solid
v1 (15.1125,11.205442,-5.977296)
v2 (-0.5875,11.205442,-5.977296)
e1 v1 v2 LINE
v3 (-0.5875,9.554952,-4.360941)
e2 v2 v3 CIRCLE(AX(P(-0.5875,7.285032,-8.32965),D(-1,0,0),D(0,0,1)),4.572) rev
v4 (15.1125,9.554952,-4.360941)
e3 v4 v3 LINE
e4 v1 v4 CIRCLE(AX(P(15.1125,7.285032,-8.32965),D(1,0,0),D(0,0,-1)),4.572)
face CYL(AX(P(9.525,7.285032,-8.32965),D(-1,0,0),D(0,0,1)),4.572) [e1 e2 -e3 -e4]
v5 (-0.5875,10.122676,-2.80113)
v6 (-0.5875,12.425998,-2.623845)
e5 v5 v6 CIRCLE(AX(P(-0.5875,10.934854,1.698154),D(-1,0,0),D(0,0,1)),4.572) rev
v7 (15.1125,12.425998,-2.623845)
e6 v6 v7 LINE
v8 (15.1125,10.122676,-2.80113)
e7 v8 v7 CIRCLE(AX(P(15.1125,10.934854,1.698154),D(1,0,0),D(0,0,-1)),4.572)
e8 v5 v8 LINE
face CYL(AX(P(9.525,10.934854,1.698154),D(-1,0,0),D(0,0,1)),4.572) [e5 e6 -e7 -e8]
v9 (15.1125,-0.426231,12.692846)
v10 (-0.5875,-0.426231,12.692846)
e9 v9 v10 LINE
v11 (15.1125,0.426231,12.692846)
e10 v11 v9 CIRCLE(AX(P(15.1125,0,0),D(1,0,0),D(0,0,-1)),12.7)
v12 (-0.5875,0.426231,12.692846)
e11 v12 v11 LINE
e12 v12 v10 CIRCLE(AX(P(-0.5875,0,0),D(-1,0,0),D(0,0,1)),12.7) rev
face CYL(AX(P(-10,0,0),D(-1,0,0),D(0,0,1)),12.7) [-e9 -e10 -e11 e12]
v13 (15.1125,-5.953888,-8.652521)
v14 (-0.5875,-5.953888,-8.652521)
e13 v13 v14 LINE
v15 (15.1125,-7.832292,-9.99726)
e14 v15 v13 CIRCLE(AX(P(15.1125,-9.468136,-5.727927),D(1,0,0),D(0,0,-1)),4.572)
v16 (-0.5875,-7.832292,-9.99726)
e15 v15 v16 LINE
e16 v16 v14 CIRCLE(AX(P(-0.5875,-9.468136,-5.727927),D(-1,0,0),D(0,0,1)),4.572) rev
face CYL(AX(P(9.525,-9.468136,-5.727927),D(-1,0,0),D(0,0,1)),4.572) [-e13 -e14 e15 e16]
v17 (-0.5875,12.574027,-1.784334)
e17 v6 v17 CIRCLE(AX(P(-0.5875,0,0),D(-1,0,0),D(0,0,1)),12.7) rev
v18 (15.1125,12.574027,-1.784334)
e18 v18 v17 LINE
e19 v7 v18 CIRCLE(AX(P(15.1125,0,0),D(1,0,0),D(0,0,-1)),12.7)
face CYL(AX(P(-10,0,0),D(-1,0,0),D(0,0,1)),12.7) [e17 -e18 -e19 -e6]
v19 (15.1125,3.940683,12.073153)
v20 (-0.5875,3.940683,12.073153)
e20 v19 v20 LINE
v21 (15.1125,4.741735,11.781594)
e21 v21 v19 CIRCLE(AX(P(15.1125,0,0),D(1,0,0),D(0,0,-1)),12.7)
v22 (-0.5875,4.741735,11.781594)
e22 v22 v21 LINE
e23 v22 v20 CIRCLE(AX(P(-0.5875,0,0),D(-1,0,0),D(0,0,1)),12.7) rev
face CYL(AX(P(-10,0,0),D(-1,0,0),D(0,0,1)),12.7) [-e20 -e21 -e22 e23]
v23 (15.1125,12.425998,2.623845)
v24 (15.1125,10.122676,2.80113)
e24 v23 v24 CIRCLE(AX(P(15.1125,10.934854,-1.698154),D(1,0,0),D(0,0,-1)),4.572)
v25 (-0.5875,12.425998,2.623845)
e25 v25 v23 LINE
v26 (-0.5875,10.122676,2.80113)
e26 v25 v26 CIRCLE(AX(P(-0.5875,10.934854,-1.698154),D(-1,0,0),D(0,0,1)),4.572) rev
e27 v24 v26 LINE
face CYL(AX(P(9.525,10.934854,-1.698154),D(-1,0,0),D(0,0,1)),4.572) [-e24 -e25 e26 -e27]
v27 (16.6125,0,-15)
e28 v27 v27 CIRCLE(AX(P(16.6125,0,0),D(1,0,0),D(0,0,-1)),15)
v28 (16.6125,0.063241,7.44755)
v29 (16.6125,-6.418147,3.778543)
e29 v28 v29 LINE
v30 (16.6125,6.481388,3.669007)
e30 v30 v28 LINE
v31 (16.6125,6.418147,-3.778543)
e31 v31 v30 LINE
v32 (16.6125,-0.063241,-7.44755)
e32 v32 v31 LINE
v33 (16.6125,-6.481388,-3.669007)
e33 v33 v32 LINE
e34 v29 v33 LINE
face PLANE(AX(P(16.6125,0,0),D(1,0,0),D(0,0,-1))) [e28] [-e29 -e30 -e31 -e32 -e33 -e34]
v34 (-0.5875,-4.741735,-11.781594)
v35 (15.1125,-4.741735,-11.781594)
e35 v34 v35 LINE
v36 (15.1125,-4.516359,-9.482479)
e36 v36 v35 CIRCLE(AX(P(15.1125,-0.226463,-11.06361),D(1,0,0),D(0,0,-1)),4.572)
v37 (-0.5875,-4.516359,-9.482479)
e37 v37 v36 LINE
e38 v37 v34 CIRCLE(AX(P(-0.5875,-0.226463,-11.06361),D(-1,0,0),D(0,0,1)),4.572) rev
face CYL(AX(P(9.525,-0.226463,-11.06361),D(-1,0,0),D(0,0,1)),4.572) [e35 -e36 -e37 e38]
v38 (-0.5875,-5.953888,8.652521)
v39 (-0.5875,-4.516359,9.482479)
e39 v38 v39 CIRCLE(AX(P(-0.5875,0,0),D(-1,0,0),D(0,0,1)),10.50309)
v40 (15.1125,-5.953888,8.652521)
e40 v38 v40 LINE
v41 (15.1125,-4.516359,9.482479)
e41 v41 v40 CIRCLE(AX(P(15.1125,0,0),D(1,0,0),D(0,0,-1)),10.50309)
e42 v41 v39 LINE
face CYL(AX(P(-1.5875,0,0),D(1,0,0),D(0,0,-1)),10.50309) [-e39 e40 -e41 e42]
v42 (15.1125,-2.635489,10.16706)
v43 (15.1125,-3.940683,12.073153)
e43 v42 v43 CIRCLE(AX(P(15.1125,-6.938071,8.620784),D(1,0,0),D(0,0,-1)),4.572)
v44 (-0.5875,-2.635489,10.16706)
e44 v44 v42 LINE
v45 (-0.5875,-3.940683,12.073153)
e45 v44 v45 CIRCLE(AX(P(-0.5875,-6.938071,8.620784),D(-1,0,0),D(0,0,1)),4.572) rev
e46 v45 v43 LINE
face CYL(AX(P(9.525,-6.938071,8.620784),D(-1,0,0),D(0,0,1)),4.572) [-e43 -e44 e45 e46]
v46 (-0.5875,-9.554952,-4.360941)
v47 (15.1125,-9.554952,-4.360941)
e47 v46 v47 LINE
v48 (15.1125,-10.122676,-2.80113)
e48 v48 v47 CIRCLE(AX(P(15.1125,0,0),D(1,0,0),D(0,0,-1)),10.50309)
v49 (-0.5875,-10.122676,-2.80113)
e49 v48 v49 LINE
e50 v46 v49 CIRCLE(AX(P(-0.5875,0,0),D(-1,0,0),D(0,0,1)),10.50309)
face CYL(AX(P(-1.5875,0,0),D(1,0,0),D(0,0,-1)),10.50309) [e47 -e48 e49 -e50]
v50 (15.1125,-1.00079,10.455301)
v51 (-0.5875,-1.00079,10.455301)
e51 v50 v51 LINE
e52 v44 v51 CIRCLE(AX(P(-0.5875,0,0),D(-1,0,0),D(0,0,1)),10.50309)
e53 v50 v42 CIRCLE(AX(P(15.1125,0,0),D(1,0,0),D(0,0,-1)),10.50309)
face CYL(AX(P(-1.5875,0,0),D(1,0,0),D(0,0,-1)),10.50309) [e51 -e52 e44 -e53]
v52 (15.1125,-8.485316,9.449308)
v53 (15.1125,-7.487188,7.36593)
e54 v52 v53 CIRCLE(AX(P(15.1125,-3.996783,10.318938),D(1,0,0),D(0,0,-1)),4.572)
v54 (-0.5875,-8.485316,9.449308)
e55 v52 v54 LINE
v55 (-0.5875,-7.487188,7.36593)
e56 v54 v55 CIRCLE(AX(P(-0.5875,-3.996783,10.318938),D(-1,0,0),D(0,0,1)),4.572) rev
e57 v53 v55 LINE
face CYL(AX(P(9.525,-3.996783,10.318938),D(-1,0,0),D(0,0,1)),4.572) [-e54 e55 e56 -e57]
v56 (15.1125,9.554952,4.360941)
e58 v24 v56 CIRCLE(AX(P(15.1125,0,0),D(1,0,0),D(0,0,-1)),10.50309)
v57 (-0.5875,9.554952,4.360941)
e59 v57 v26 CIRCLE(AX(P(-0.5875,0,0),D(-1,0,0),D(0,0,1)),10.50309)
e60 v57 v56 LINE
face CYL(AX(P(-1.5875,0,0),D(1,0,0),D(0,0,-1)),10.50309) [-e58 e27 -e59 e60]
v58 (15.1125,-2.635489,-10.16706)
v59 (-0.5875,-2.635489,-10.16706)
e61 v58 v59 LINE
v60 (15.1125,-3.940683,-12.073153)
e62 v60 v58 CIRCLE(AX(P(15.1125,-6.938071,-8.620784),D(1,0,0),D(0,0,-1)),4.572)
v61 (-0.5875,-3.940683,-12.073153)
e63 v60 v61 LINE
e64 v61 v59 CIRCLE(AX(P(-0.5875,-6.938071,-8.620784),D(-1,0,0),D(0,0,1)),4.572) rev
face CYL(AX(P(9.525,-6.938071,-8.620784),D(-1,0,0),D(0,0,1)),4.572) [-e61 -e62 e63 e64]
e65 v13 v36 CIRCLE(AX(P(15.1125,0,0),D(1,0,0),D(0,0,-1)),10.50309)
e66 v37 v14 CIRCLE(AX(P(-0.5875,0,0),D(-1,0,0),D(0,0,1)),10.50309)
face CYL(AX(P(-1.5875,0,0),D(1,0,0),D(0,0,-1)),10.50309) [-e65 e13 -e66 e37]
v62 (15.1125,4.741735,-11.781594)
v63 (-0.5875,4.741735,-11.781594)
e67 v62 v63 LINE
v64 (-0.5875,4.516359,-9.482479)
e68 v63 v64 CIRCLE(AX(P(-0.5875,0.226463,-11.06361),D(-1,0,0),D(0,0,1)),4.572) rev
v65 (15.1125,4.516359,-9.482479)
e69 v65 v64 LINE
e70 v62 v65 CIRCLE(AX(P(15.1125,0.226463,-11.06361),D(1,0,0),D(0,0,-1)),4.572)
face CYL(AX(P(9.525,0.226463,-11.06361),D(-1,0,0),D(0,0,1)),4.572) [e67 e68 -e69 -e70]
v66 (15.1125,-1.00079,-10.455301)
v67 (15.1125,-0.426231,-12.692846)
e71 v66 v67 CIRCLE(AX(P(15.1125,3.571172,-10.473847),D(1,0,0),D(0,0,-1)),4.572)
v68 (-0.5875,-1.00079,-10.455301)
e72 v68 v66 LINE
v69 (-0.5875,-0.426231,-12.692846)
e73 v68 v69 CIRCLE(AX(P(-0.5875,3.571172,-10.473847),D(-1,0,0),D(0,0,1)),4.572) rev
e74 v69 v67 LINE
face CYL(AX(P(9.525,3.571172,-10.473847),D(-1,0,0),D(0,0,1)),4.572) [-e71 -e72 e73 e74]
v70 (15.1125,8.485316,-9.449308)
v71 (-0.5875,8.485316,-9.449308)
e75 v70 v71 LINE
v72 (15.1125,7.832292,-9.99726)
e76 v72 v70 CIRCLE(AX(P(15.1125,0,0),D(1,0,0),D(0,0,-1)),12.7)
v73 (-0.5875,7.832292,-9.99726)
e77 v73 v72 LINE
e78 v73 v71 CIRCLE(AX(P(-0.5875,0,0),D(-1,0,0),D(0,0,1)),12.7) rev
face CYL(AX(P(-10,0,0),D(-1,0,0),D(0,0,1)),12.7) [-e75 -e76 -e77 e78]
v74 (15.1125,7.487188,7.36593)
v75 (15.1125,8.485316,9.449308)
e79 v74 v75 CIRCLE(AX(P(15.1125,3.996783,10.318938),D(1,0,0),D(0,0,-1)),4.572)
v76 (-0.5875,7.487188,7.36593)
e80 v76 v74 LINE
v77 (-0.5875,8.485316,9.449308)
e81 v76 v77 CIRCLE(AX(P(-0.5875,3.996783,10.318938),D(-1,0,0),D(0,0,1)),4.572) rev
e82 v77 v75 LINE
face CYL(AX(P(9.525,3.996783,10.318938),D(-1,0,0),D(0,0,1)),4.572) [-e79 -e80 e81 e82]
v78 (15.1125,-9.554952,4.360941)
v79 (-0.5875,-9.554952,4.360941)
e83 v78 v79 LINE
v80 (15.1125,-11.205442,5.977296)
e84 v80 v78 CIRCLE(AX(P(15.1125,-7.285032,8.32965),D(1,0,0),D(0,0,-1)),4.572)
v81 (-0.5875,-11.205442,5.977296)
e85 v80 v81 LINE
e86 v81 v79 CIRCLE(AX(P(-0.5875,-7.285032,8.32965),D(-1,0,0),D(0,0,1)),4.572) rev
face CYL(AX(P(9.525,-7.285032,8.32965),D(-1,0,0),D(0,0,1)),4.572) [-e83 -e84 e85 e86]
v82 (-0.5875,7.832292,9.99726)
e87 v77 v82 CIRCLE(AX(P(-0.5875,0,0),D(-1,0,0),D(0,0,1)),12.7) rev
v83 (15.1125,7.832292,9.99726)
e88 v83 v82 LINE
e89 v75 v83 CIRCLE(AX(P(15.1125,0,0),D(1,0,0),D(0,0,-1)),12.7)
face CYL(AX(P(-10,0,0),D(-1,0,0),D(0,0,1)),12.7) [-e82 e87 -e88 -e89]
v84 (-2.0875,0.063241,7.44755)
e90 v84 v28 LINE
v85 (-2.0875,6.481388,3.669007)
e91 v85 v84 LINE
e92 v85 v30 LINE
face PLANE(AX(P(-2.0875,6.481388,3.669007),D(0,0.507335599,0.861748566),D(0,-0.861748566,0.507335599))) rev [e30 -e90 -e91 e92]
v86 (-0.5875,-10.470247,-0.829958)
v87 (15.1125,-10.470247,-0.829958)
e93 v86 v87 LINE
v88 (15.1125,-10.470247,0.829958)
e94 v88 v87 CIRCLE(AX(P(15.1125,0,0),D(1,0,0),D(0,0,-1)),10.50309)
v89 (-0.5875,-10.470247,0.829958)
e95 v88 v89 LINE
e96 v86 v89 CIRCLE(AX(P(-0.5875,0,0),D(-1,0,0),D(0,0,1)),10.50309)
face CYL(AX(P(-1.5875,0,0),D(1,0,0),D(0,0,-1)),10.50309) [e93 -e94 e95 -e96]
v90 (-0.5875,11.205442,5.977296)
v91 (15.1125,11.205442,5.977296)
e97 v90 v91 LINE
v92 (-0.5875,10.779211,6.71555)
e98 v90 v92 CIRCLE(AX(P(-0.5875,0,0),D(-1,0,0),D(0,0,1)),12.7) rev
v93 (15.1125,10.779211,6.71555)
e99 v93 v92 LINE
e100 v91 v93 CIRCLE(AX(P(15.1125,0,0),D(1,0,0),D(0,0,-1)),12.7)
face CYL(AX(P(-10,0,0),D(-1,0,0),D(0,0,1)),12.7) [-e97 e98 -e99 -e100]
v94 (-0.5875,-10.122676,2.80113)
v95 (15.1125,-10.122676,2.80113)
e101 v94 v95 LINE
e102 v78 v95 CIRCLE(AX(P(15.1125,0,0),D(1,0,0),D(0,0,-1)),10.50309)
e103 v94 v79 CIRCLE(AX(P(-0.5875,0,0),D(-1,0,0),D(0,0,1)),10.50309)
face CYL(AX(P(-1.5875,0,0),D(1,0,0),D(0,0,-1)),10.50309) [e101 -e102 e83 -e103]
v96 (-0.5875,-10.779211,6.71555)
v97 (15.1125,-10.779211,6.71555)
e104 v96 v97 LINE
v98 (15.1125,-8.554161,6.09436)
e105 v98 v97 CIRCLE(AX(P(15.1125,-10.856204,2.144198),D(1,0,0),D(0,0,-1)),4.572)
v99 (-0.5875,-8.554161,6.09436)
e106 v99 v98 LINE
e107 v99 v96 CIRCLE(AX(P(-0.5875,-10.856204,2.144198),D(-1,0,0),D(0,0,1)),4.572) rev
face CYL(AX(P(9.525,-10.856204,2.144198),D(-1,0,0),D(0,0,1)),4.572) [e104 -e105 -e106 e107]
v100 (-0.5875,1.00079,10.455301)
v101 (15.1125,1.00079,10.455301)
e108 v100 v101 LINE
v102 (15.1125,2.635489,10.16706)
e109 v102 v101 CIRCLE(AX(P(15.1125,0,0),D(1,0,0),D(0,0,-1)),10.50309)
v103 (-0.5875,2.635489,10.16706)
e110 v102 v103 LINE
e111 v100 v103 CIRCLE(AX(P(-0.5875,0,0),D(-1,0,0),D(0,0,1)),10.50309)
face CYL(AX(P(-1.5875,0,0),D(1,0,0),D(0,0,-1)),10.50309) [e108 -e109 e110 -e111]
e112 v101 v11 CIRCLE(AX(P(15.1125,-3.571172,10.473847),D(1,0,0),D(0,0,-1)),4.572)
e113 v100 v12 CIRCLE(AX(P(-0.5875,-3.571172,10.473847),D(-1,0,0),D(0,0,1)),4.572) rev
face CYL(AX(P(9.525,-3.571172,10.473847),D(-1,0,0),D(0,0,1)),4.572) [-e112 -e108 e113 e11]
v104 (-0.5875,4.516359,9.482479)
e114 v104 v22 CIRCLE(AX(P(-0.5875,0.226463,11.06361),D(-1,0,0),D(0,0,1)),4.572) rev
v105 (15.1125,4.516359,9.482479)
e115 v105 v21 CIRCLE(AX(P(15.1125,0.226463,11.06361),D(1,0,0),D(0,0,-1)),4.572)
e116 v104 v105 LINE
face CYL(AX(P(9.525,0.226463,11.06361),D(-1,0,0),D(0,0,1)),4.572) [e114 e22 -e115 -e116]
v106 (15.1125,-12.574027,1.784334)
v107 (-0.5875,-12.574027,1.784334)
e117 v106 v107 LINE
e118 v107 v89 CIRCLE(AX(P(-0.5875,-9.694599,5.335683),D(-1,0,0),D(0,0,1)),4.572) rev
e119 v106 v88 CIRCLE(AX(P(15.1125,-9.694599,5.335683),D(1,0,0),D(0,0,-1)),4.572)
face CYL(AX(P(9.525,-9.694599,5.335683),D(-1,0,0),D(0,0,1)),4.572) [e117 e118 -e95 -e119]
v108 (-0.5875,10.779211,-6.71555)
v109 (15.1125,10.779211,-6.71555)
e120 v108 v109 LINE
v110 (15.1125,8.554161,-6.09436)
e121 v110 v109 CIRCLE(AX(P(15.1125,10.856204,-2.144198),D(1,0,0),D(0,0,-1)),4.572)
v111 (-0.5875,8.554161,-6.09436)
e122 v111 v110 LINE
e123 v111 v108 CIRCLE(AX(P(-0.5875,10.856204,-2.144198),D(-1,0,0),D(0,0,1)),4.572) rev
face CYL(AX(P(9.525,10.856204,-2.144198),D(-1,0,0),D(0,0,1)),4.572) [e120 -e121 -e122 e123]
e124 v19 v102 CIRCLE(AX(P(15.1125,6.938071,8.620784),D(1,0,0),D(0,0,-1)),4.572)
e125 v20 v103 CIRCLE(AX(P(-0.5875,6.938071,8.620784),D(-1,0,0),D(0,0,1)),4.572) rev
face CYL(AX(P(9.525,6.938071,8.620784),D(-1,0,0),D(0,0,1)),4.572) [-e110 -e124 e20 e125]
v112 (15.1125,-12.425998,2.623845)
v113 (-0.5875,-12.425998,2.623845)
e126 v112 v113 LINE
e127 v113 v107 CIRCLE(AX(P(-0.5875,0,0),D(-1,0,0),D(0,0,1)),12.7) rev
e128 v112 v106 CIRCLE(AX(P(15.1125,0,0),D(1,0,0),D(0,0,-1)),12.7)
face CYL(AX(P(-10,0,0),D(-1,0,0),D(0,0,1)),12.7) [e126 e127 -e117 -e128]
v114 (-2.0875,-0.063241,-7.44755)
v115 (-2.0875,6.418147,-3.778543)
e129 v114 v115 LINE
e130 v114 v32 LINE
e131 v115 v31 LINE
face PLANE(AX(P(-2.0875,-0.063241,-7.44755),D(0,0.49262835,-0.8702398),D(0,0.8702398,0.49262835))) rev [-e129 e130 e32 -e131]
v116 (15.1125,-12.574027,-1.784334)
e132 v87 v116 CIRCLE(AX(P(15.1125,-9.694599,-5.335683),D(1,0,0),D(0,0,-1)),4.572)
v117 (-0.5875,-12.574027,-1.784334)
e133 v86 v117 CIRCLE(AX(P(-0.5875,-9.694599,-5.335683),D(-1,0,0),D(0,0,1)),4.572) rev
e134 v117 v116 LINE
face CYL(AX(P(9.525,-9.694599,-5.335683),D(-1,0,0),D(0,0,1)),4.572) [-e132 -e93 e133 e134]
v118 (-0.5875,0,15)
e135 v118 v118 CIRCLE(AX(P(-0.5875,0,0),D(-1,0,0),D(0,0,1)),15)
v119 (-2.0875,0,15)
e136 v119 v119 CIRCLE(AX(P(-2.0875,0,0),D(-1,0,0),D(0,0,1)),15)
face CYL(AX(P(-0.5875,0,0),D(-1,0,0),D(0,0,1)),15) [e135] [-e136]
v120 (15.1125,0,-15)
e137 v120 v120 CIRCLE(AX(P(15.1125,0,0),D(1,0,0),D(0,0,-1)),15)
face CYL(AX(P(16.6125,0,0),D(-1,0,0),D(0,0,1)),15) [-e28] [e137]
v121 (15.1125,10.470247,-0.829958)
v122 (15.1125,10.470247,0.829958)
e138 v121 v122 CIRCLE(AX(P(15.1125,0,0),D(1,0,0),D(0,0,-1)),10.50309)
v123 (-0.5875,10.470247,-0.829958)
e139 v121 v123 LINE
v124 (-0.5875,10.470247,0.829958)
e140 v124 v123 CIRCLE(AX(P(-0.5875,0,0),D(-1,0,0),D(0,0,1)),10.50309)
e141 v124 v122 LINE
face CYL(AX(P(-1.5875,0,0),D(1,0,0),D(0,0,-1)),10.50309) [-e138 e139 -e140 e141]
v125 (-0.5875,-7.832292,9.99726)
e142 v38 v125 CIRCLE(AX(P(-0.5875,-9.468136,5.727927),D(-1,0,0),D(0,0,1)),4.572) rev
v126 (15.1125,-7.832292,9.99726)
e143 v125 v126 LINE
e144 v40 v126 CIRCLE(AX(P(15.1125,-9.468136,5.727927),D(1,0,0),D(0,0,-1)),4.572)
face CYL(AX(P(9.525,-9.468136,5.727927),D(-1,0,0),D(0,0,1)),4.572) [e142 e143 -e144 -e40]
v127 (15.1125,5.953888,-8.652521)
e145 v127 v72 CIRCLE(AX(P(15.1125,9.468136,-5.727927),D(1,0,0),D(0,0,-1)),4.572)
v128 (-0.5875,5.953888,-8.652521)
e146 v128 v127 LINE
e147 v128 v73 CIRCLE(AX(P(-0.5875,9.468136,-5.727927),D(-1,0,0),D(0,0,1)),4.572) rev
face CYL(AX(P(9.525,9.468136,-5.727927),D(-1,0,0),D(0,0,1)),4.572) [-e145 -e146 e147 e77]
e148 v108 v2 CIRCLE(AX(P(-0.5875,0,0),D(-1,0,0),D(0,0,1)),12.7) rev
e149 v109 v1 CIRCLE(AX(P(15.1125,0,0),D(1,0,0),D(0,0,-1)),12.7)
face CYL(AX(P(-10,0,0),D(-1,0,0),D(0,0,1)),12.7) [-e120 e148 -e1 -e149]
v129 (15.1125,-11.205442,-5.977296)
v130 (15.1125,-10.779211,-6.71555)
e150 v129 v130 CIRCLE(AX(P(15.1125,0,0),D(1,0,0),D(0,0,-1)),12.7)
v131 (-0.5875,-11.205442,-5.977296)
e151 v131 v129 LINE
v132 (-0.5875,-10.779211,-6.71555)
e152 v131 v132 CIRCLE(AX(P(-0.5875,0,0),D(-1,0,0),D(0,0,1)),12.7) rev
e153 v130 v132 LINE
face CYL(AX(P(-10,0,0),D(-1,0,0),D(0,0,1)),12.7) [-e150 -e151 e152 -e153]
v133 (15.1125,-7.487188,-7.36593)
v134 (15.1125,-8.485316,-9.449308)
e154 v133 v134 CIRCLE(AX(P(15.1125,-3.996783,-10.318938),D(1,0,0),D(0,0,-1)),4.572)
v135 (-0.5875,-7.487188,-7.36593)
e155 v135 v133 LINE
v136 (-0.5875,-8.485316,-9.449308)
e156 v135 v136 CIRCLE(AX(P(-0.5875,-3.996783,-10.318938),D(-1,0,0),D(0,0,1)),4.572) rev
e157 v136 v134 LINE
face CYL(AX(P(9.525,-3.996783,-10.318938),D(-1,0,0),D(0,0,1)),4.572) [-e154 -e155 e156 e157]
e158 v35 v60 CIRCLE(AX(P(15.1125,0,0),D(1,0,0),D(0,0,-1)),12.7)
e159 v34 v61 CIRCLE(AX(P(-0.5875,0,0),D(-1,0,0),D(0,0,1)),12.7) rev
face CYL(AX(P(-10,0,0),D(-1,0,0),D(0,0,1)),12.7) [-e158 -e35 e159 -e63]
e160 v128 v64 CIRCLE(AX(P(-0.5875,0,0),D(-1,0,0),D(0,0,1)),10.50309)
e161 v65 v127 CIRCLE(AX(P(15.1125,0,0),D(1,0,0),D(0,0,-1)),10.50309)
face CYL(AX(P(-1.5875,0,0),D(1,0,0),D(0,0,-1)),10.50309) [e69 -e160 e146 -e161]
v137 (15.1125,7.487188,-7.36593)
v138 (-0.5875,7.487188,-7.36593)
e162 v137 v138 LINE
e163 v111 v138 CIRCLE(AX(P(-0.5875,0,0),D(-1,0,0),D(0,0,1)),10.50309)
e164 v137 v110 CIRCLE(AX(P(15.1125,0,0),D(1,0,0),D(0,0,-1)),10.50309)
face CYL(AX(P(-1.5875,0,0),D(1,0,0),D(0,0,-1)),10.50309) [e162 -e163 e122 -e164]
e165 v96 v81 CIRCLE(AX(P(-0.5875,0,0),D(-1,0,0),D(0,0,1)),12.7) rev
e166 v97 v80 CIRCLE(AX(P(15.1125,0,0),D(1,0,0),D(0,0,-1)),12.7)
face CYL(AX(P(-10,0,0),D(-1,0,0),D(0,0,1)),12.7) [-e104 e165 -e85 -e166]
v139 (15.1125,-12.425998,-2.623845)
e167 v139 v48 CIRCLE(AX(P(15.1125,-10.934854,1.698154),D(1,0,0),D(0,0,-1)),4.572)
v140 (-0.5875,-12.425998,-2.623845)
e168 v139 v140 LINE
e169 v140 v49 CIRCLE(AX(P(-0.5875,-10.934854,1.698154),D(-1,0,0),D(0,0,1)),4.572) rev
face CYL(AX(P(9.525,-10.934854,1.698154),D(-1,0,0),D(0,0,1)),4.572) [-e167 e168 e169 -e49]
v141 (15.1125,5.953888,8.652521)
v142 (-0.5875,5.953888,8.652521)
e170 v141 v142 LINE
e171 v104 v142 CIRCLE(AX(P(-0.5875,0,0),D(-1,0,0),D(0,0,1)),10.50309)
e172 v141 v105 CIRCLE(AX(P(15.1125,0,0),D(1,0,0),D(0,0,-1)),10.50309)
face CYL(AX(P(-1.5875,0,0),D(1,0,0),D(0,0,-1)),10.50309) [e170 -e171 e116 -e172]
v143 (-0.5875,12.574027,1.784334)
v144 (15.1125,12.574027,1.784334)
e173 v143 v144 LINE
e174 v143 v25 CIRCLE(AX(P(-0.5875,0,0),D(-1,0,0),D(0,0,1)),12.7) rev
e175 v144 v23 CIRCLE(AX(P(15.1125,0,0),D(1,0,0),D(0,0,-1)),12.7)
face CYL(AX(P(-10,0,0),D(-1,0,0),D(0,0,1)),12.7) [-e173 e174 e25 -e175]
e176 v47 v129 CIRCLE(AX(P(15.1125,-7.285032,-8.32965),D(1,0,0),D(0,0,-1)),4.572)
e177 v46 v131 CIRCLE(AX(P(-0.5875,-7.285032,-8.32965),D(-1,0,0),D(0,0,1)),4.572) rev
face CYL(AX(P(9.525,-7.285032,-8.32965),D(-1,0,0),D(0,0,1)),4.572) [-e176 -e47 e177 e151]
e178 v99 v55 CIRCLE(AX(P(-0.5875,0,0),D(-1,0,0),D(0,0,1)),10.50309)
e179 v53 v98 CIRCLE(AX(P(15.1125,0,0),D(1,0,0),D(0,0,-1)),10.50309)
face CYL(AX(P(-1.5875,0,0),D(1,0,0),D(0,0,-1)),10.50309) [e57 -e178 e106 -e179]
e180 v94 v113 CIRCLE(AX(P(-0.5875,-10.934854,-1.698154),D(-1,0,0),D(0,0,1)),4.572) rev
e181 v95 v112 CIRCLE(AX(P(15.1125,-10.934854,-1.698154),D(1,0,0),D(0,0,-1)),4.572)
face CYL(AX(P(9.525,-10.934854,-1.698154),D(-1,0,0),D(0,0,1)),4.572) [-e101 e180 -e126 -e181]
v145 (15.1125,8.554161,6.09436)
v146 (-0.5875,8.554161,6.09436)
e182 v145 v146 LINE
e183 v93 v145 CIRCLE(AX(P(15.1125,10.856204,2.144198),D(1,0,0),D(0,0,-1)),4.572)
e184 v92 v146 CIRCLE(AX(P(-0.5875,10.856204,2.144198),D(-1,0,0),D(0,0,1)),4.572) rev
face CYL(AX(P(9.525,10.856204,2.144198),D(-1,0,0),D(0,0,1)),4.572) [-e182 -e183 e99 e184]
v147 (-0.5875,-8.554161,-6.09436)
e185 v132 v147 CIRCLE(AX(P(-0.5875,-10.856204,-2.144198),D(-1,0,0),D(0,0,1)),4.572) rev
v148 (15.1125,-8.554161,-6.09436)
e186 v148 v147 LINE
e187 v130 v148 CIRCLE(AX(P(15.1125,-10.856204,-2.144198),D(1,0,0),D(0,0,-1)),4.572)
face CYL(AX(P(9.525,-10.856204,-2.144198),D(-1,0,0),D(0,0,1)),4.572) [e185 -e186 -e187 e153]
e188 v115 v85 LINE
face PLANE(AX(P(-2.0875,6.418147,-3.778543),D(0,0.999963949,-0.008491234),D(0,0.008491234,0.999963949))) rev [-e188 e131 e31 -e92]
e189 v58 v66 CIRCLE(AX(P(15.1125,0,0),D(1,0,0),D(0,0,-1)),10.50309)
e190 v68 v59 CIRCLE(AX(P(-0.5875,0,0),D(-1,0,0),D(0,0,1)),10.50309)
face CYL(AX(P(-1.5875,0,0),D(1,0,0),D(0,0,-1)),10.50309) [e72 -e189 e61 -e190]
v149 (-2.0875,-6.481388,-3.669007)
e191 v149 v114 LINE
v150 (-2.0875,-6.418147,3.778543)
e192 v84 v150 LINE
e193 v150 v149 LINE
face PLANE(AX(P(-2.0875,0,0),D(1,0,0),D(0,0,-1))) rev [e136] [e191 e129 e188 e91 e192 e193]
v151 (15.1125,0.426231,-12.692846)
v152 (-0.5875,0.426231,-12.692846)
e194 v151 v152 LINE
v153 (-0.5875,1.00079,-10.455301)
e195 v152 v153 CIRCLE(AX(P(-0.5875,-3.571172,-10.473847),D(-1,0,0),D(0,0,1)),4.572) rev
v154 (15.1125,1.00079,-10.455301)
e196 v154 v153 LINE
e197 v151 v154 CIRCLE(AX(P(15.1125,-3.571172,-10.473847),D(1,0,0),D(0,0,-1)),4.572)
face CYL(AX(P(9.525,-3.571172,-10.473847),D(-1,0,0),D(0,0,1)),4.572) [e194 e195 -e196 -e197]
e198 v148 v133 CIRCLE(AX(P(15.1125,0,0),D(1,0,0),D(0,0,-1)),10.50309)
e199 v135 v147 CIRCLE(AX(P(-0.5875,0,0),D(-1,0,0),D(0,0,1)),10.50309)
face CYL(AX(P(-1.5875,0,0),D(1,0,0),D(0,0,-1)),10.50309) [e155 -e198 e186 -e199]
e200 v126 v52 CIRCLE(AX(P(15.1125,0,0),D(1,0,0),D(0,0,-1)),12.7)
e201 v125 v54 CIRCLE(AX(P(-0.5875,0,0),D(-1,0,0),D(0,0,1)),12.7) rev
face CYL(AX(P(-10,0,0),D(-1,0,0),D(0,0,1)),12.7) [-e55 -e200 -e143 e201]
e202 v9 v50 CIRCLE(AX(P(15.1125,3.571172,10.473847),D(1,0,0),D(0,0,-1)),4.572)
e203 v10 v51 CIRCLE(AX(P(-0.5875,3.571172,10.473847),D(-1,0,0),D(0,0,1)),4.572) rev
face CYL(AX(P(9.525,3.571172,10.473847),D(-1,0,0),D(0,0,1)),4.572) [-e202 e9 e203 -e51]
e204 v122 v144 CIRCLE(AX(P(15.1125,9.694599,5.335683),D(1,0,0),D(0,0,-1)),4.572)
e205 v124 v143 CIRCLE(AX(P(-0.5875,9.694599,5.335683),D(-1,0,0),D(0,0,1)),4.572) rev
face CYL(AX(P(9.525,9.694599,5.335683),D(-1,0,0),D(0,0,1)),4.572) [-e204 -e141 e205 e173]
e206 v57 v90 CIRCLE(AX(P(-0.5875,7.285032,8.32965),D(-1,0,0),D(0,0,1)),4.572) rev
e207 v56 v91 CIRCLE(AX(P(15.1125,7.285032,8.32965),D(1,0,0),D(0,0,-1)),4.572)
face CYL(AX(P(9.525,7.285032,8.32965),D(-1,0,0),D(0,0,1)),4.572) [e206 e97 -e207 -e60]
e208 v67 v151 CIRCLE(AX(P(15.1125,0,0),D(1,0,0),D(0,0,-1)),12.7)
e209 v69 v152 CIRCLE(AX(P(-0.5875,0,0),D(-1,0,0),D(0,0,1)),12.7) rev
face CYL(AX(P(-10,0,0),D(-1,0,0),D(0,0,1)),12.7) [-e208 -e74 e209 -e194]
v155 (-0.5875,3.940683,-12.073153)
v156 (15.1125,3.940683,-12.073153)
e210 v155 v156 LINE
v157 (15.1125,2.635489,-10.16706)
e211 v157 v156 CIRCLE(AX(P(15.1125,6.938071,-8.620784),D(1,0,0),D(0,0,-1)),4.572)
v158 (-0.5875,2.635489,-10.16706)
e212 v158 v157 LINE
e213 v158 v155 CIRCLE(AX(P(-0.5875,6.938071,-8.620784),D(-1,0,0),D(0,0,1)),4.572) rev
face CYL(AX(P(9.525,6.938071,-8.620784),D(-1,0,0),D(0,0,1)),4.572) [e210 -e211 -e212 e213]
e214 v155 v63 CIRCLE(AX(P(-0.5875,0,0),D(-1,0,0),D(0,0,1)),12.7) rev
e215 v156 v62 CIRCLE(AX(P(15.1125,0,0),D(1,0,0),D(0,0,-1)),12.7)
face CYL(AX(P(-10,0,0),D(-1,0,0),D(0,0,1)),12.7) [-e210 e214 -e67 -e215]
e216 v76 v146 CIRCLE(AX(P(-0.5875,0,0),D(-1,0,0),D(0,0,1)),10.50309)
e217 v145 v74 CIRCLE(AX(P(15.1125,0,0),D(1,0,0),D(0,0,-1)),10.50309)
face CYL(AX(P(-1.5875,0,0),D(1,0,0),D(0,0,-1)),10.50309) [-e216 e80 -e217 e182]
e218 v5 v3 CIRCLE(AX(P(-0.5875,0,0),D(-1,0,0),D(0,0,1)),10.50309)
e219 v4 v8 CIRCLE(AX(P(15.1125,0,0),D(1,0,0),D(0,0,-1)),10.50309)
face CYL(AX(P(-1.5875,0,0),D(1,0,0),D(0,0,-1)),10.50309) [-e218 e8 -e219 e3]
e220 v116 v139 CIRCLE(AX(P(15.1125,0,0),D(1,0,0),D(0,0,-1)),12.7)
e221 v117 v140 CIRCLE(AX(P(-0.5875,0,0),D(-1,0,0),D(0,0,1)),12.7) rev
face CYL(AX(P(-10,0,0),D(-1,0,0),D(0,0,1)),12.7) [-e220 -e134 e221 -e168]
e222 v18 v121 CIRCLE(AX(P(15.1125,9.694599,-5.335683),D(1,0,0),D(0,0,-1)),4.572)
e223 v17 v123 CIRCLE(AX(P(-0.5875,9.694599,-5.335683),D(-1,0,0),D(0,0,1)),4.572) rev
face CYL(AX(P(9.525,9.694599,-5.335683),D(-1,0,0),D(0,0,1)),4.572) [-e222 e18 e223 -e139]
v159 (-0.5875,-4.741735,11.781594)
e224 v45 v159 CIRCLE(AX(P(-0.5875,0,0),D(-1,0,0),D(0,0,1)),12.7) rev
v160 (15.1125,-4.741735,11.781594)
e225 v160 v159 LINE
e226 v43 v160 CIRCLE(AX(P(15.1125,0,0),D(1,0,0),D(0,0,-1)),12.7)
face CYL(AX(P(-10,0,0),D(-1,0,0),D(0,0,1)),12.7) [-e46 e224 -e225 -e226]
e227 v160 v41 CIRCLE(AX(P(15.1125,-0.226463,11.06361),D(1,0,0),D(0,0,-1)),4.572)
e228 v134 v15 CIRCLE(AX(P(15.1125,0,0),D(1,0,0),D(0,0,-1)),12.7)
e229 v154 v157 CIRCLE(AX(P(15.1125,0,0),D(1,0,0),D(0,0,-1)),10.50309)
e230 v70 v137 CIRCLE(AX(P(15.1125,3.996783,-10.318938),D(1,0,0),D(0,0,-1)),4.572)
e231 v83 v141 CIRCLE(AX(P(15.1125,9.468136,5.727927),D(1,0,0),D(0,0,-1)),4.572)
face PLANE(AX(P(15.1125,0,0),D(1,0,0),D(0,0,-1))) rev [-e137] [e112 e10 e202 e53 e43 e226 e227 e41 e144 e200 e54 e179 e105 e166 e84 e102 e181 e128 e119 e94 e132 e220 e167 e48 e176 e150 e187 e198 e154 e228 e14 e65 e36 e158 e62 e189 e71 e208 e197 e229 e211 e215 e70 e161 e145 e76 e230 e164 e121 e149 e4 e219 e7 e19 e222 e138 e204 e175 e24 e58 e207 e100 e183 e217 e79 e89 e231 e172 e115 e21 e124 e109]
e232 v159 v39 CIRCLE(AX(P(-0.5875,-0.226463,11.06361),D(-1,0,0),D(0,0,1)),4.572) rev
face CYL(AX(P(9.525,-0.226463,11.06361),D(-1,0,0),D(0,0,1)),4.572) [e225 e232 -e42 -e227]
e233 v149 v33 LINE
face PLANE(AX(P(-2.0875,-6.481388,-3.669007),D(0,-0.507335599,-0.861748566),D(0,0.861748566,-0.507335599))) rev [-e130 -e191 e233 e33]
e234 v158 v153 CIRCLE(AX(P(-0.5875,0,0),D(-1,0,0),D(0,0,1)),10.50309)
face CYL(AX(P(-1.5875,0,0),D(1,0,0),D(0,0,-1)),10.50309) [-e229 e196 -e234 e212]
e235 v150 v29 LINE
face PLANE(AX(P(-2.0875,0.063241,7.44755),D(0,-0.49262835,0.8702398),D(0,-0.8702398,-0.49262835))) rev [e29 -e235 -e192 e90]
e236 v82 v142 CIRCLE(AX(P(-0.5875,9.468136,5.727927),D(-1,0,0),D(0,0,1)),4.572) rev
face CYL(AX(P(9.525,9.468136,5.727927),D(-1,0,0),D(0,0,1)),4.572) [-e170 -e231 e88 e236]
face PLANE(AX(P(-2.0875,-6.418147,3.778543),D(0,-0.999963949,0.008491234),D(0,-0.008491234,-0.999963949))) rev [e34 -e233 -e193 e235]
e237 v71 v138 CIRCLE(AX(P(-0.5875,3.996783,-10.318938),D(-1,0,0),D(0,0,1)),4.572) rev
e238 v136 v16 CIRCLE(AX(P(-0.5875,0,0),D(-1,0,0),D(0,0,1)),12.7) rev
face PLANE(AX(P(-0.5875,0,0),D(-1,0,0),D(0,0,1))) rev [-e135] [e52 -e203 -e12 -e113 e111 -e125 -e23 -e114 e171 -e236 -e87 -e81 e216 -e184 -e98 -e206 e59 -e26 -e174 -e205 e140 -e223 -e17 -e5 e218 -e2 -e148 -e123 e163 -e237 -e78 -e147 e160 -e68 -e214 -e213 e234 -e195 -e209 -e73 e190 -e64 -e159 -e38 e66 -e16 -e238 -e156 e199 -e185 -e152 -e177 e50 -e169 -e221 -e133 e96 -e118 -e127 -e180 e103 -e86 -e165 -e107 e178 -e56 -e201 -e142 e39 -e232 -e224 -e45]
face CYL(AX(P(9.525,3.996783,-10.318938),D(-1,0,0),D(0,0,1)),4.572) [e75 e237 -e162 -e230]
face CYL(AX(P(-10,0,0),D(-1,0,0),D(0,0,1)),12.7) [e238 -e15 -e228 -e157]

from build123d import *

# Parameters (mm, degrees)
BOSS_EXTRUDE1_DEPTH      = 4
BOSS_EXTRUDE1_DEPTH_BACK = 13.2
SKETCH2_R                = 15
SKETCH2_R_2              = 7.854644271
BOSS_EXTRUDE2_DEPTH      = 1.5
SKETCH3_R                = 15
SKETCH3_R_2              = 9.60106287
BOSS_EXTRUDE3_DEPTH      = 1.5
BOSS_EXTRUDE4_DEPTH      = 1.5
BOSS_EXTRUDE4_DEPTH_BACK = 16.7
SKETCH5_R                = 10.503090292
CUT_EXTRUDE1_DEPTH       = 29.278790639


# Read off the part's stored shape, not the designer's step: am-4212 18T 20DP 500hex 375 FW.STEP<1>
with BuildPart() as part:
    # Sketch1 → Boss-Extrude1 (new, two sides: drawn at the far end of the back side and taken through both)
    # profile 1 of 19: a face of its own
    with BuildSketch(Plane(origin=(11.1125, 0, 0), x_dir=(0, 0, -1), z_dir=(1, 0, 0)).offset(-BOSS_EXTRUDE1_DEPTH_BACK)):
        with BuildLine():
            ThreePointArc((-12.692845514, 0.426230867), (-12.7, 0), (-12.692845514, -0.426230867))
            ThreePointArc((-12.692845514, -0.426230867), (-12.311027604, -0.61546759), (-11.913249275, -0.768333072))
            ThreePointArc((-11.913249275, -0.768333072), (-11.938, 0), (-11.913249275, 0.768333072))
            ThreePointArc((-11.913249275, 0.768333072), (-12.311027604, 0.61546759), (-12.692845514, 0.426230867))
        make_face()
    # profile 2 of 19: a face of its own
    with BuildSketch(Plane(origin=(11.1125, 0, 0), x_dir=(0, 0, -1), z_dir=(1, 0, 0)).offset(-BOSS_EXTRUDE1_DEPTH_BACK)):
        with BuildLine():
            ThreePointArc((-11.913249275, 0.768333072), (-11.938, 0), (-11.913249275, -0.768333072))
            ThreePointArc((-11.913249275, -0.768333072), (-10.87193442, -0.983463934), (-9.809087715, -0.952242218))
            ThreePointArc((-9.809087715, -0.952242218), (-9.705477367, -1.711337521), (-9.543213362, -2.4600906))
            ThreePointArc((-9.543213362, -2.4600906), (-10.552641024, -2.794266767), (-11.457577821, -3.352574307))
            ThreePointArc((-11.457577821, -3.352574307), (-11.218050507, -4.083036471), (-10.932007046, -4.796568142))
            ThreePointArc((-10.932007046, -4.796568142), (-9.879912073, -4.64257437), (-8.891841322, -4.249720572))
            ThreePointArc((-8.891841322, -4.249720572), (-8.534853559, -4.9276), (-8.126286635, -5.575700185))
            ThreePointArc((-8.126286635, -5.575700185), (-8.96054338, -6.234967657), (-9.619953385, -7.069111745))
            ThreePointArc((-9.619953385, -7.069111745), (-9.145038562, -7.673598484), (-8.632203428, -8.246266305))
            ThreePointArc((-8.632203428, -8.246266305), (-7.696226517, -7.74172182), (-6.902107637, -7.034619905))
            ThreePointArc((-6.902107637, -7.034619905), (-6.334800451, -7.549521196), (-5.729209809, -8.01879804))
            ThreePointArc((-5.729209809, -8.01879804), (-6.287671961, -8.923639429), (-6.622020596, -9.933009978))
            ThreePointArc((-6.622020596, -9.933009978), (-5.969, -10.33861127), (-5.291228679, -10.70134305))
            ThreePointArc((-5.291228679, -10.70134305), (-4.58426246, -9.907103363), (-4.079877906, -8.971040258))
            ThreePointArc((-4.079877906, -8.971040258), (-3.370676917, -9.260858716), (-2.641105726, -9.494710506))
            ThreePointArc((-2.641105726, -9.494710506), (-2.856414507, -10.535988587), (-2.825374393, -11.598840612))
            ThreePointArc((-2.825374393, -11.598840612), (-2.073011945, -11.756634955), (-1.312053661, -11.865679887))
            ThreePointArc((-1.312053661, -11.865679887), (-0.919368693, -10.877542027), (-0.765554687, -9.825420757))
            ThreePointArc((-0.765554687, -9.825420757), (0, -9.8552), (0.765554687, -9.825420757))
            ThreePointArc((0.765554687, -9.825420757), (0.919368693, -10.877542027), (1.312053661, -11.865679887))
            ThreePointArc((1.312053661, -11.865679887), (2.073011945, -11.756634955), (2.825374393, -11.598840612))
            ThreePointArc((2.825374393, -11.598840612), (2.856414507, -10.535988587), (2.641105726, -9.494710506))
            ThreePointArc((2.641105726, -9.494710506), (3.370676917, -9.260858716), (4.079877906, -8.971040258))
            ThreePointArc((4.079877906, -8.971040258), (4.58426246, -9.907103363), (5.291228679, -10.70134305))
            ThreePointArc((5.291228679, -10.70134305), (5.969, -10.33861127), (6.622020596, -9.933009978))
            ThreePointArc((6.622020596, -9.933009978), (6.287671961, -8.923639429), (5.729209809, -8.01879804))
            ThreePointArc((5.729209809, -8.01879804), (6.334800451, -7.549521196), (6.902107637, -7.034619905))
            ThreePointArc((6.902107637, -7.034619905), (7.696226517, -7.74172182), (8.632203428, -8.246266305))
            ThreePointArc((8.632203428, -8.246266305), (9.145038562, -7.673598484), (9.619953385, -7.069111745))
            ThreePointArc((9.619953385, -7.069111745), (8.96054338, -6.234967657), (8.126286635, -5.575700185))
            ThreePointArc((8.126286635, -5.575700185), (8.534853559, -4.9276), (8.891841322, -4.249720572))
            ThreePointArc((8.891841322, -4.249720572), (9.879912073, -4.64257437), (10.932007046, -4.796568142))
            ThreePointArc((10.932007046, -4.796568142), (11.218050507, -4.083036471), (11.457577821, -3.352574307))
            ThreePointArc((11.457577821, -3.352574307), (10.552641024, -2.794266767), (9.543213362, -2.4600906))
            ThreePointArc((9.543213362, -2.4600906), (9.705477367, -1.711337521), (9.809087715, -0.952242218))
            ThreePointArc((9.809087715, -0.952242218), (10.87193442, -0.983463934), (11.913249275, -0.768333072))
            ThreePointArc((11.913249275, -0.768333072), (11.938, 0), (11.913249275, 0.768333072))
            ThreePointArc((11.913249275, 0.768333072), (10.87193442, 0.983463934), (9.809087715, 0.952242218))
            ThreePointArc((9.809087715, 0.952242218), (9.705477367, 1.711337521), (9.543213362, 2.4600906))
            ThreePointArc((9.543213362, 2.4600906), (10.552641024, 2.794266767), (11.457577821, 3.352574307))
            ThreePointArc((11.457577821, 3.352574307), (11.218050507, 4.083036471), (10.932007046, 4.796568142))
            ThreePointArc((10.932007046, 4.796568142), (9.879912073, 4.64257437), (8.891841322, 4.249720572))
            ThreePointArc((8.891841322, 4.249720572), (8.534853559, 4.9276), (8.126286635, 5.575700185))
            ThreePointArc((8.126286635, 5.575700185), (8.96054338, 6.234967657), (9.619953385, 7.069111745))
            ThreePointArc((9.619953385, 7.069111745), (9.145038562, 7.673598484), (8.632203428, 8.246266305))
            ThreePointArc((8.632203428, 8.246266305), (7.696226517, 7.74172182), (6.902107637, 7.034619905))
            ThreePointArc((6.902107637, 7.034619905), (6.334800451, 7.549521196), (5.729209809, 8.01879804))
            ThreePointArc((5.729209809, 8.01879804), (6.287671961, 8.923639429), (6.622020596, 9.933009978))
            ThreePointArc((6.622020596, 9.933009978), (5.969, 10.33861127), (5.291228679, 10.70134305))
            ThreePointArc((5.291228679, 10.70134305), (4.58426246, 9.907103363), (4.079877906, 8.971040258))
            ThreePointArc((4.079877906, 8.971040258), (3.370676917, 9.260858716), (2.641105726, 9.494710506))
            ThreePointArc((2.641105726, 9.494710506), (2.856414507, 10.535988587), (2.825374393, 11.598840612))
            ThreePointArc((2.825374393, 11.598840612), (2.073011945, 11.756634955), (1.312053661, 11.865679887))
            ThreePointArc((1.312053661, 11.865679887), (0.919368693, 10.877542027), (0.765554687, 9.825420757))
            ThreePointArc((0.765554687, 9.825420757), (0, 9.8552), (-0.765554687, 9.825420757))
            ThreePointArc((-0.765554687, 9.825420757), (-0.919368693, 10.877542027), (-1.312053661, 11.865679887))
            ThreePointArc((-1.312053661, 11.865679887), (-2.073011945, 11.756634955), (-2.825374393, 11.598840612))
            ThreePointArc((-2.825374393, 11.598840612), (-2.856414507, 10.535988587), (-2.641105726, 9.494710506))
            ThreePointArc((-2.641105726, 9.494710506), (-3.370676917, 9.260858716), (-4.079877906, 8.971040258))
            ThreePointArc((-4.079877906, 8.971040258), (-4.58426246, 9.907103363), (-5.291228679, 10.70134305))
            ThreePointArc((-5.291228679, 10.70134305), (-5.969, 10.33861127), (-6.622020596, 9.933009978))
            ThreePointArc((-6.622020596, 9.933009978), (-6.287671961, 8.923639429), (-5.729209809, 8.01879804))
            ThreePointArc((-5.729209809, 8.01879804), (-6.334800451, 7.549521196), (-6.902107637, 7.034619905))
            ThreePointArc((-6.902107637, 7.034619905), (-7.696226517, 7.74172182), (-8.632203428, 8.246266305))
            ThreePointArc((-8.632203428, 8.246266305), (-9.145038562, 7.673598484), (-9.619953385, 7.069111745))
            ThreePointArc((-9.619953385, 7.069111745), (-8.96054338, 6.234967657), (-8.126286635, 5.575700185))
            ThreePointArc((-8.126286635, 5.575700185), (-8.534853559, 4.9276), (-8.891841322, 4.249720572))
            ThreePointArc((-8.891841322, 4.249720572), (-9.879912073, 4.64257437), (-10.932007046, 4.796568142))
            ThreePointArc((-10.932007046, 4.796568142), (-11.218050507, 4.083036471), (-11.457577821, 3.352574307))
            ThreePointArc((-11.457577821, 3.352574307), (-10.552641024, 2.794266767), (-9.543213362, 2.4600906))
            ThreePointArc((-9.543213362, 2.4600906), (-9.705477367, 1.711337521), (-9.809087715, 0.952242218))
            ThreePointArc((-9.809087715, 0.952242218), (-10.87193442, 0.983463934), (-11.913249275, 0.768333072))
        make_face()
        Polygon((-3.666174209, -6.35), (-7.332348419, 0), (-3.666174209, 6.35), (3.666174209, 6.35), (7.332348419, 0), (3.666174209, -6.35), align=None, mode=Mode.SUBTRACT)
    # profile 3 of 19: a face of its own
    with BuildSketch(Plane(origin=(11.1125, 0, 0), x_dir=(0, 0, -1), z_dir=(1, 0, 0)).offset(-BOSS_EXTRUDE1_DEPTH_BACK)):
        with BuildLine():
            ThreePointArc((-10.932007046, -4.796568142), (-11.218050507, -4.083036471), (-11.457577821, -3.352574307))
            ThreePointArc((-11.457577821, -3.352574307), (-11.779084107, -3.632269073), (-12.073152809, -3.940682842))
            ThreePointArc((-12.073152809, -3.940682842), (-11.934096284, -4.34365582), (-11.781593724, -4.741734842))
            ThreePointArc((-11.781593724, -4.741734842), (-11.35807948, -4.788969778), (-10.932007046, -4.796568142))
        make_face()
    # profile 4 of 19: a face of its own
    with BuildSketch(Plane(origin=(11.1125, 0, 0), x_dir=(0, 0, -1), z_dir=(1, 0, 0)).offset(-BOSS_EXTRUDE1_DEPTH_BACK)):
        with BuildLine():
            ThreePointArc((-12.073152809, 3.940682842), (-11.779084107, 3.632269073), (-11.457577821, 3.352574307))
            ThreePointArc((-11.457577821, 3.352574307), (-11.218050507, 4.083036471), (-10.932007046, 4.796568142))
            ThreePointArc((-10.932007046, 4.796568142), (-11.35807948, 4.788969778), (-11.781593724, 4.741734842))
            ThreePointArc((-11.781593724, 4.741734842), (-11.934096284, 4.34365582), (-12.073152809, 3.940682842))
        make_face()
    # profile 5 of 19: a face of its own
    with BuildSketch(Plane(origin=(11.1125, 0, 0), x_dir=(0, 0, -1), z_dir=(1, 0, 0)).offset(-BOSS_EXTRUDE1_DEPTH_BACK)):
        with BuildLine():
            ThreePointArc((-8.632203428, -8.246266305), (-9.145038562, -7.673598484), (-9.619953385, -7.069111745))
            ThreePointArc((-9.619953385, -7.069111745), (-9.826409226, -7.441900479), (-9.997259693, -7.832292041))
            ThreePointArc((-9.997259693, -7.832292041), (-9.728764428, -8.163402643), (-9.449307854, -8.485315615))
            ThreePointArc((-9.449307854, -8.485315615), (-9.035179344, -8.384851534), (-8.632203428, -8.246266305))
        make_face()
    # profile 6 of 19: a face of its own
    with BuildSketch(Plane(origin=(11.1125, 0, 0), x_dir=(0, 0, -1), z_dir=(1, 0, 0)).offset(-BOSS_EXTRUDE1_DEPTH_BACK)):
        with BuildLine():
            ThreePointArc((-9.997259693, 7.832292041), (-9.826409226, 7.441900479), (-9.619953385, 7.069111745))
            ThreePointArc((-9.619953385, 7.069111745), (-9.145038562, 7.673598484), (-8.632203428, 8.246266305))
            ThreePointArc((-8.632203428, 8.246266305), (-9.035179344, 8.384851534), (-9.449307854, 8.485315615))
            ThreePointArc((-9.449307854, 8.485315615), (-9.728764428, 8.163402643), (-9.997259693, 7.832292041))
        make_face()
    # profile 7 of 19: a face of its own
    with BuildSketch(Plane(origin=(11.1125, 0, 0), x_dir=(0, 0, -1), z_dir=(1, 0, 0)).offset(-BOSS_EXTRUDE1_DEPTH_BACK)):
        with BuildLine():
            ThreePointArc((-5.291228679, -10.70134305), (-5.969, -10.33861127), (-6.622020596, -9.933009978))
            ThreePointArc((-6.622020596, -9.933009978), (-6.68852437, -10.353928857), (-6.715549515, -10.779211228))
            ThreePointArc((-6.715549515, -10.779211228), (-6.35, -10.998522628), (-5.977295999, -11.205442095))
            ThreePointArc((-5.977295999, -11.205442095), (-5.622503234, -10.969396447), (-5.291228679, -10.70134305))
        make_face()
    # profile 8 of 19: a face of its own
    with BuildSketch(Plane(origin=(11.1125, 0, 0), x_dir=(0, 0, -1), z_dir=(1, 0, 0)).offset(-BOSS_EXTRUDE1_DEPTH_BACK)):
        with BuildLine():
            ThreePointArc((-6.715549515, 10.779211228), (-6.68852437, 10.353928857), (-6.622020596, 9.933009978))
            ThreePointArc((-6.622020596, 9.933009978), (-5.969, 10.33861127), (-5.291228679, 10.70134305))
            ThreePointArc((-5.291228679, 10.70134305), (-5.622503234, 10.969396447), (-5.977295999, 11.205442095))
            ThreePointArc((-5.977295999, 11.205442095), (-6.35, 10.998522628), (-6.715549515, 10.779211228))
        make_face()
    # profile 9 of 19: a face of its own
    with BuildSketch(Plane(origin=(11.1125, 0, 0), x_dir=(0, 0, -1), z_dir=(1, 0, 0)).offset(-BOSS_EXTRUDE1_DEPTH_BACK)):
        with BuildLine():
            ThreePointArc((-1.312053661, -11.865679887), (-2.073011945, -11.756634955), (-2.825374393, -11.598840612))
            ThreePointArc((-2.825374393, -11.598840612), (-2.743904763, -12.017120606), (-2.623844955, -12.425998457))
            ThreePointArc((-2.623844955, -12.425998457), (-2.205331856, -12.507058463), (-1.784334031, -12.574026883))
            ThreePointArc((-1.784334031, -12.574026883), (-1.531670254, -12.230870257), (-1.312053661, -11.865679887))
        make_face()
    # profile 10 of 19: a face of its own
    with BuildSketch(Plane(origin=(11.1125, 0, 0), x_dir=(0, 0, -1), z_dir=(1, 0, 0)).offset(-BOSS_EXTRUDE1_DEPTH_BACK)):
        with BuildLine():
            ThreePointArc((-2.623844955, 12.425998457), (-2.743904763, 12.017120606), (-2.825374393, 11.598840612))
            ThreePointArc((-2.825374393, 11.598840612), (-2.073011945, 11.756634955), (-1.312053661, 11.865679887))
            ThreePointArc((-1.312053661, 11.865679887), (-1.531670254, 12.230870257), (-1.784334031, 12.574026883))
            ThreePointArc((-1.784334031, 12.574026883), (-2.205331856, 12.507058463), (-2.623844955, 12.425998457))
        make_face()
    # profile 11 of 19: a face of its own
    with BuildSketch(Plane(origin=(11.1125, 0, 0), x_dir=(0, 0, -1), z_dir=(1, 0, 0)).offset(-BOSS_EXTRUDE1_DEPTH_BACK)):
        with BuildLine():
            ThreePointArc((2.825374393, -11.598840612), (2.073011945, -11.756634955), (1.312053661, -11.865679887))
            ThreePointArc((1.312053661, -11.865679887), (1.531670254, -12.230870257), (1.784334031, -12.574026883))
            ThreePointArc((1.784334031, -12.574026883), (2.205331856, -12.507058463), (2.623844955, -12.425998457))
            ThreePointArc((2.623844955, -12.425998457), (2.743904763, -12.017120606), (2.825374393, -11.598840612))
        make_face()
    # profile 12 of 19: a face of its own
    with BuildSketch(Plane(origin=(11.1125, 0, 0), x_dir=(0, 0, -1), z_dir=(1, 0, 0)).offset(-BOSS_EXTRUDE1_DEPTH_BACK)):
        with BuildLine():
            ThreePointArc((1.784334031, 12.574026883), (1.531670254, 12.230870257), (1.312053661, 11.865679887))
            ThreePointArc((1.312053661, 11.865679887), (2.073011945, 11.756634955), (2.825374393, 11.598840612))
            ThreePointArc((2.825374393, 11.598840612), (2.743904763, 12.017120606), (2.623844955, 12.425998457))
            ThreePointArc((2.623844955, 12.425998457), (2.205331856, 12.507058463), (1.784334031, 12.574026883))
        make_face()
    # profile 13 of 19: a face of its own
    with BuildSketch(Plane(origin=(11.1125, 0, 0), x_dir=(0, 0, -1), z_dir=(1, 0, 0)).offset(-BOSS_EXTRUDE1_DEPTH_BACK)):
        with BuildLine():
            ThreePointArc((6.622020596, -9.933009978), (5.969, -10.33861127), (5.291228679, -10.70134305))
            ThreePointArc((5.291228679, -10.70134305), (5.622503234, -10.969396447), (5.977295999, -11.205442095))
            ThreePointArc((5.977295999, -11.205442095), (6.35, -10.998522628), (6.715549515, -10.779211228))
            ThreePointArc((6.715549515, -10.779211228), (6.68852437, -10.353928857), (6.622020596, -9.933009978))
        make_face()
    # profile 14 of 19: a face of its own
    with BuildSketch(Plane(origin=(11.1125, 0, 0), x_dir=(0, 0, -1), z_dir=(1, 0, 0)).offset(-BOSS_EXTRUDE1_DEPTH_BACK)):
        with BuildLine():
            ThreePointArc((5.977295999, 11.205442095), (5.622503234, 10.969396447), (5.291228679, 10.70134305))
            ThreePointArc((5.291228679, 10.70134305), (5.969, 10.33861127), (6.622020596, 9.933009978))
            ThreePointArc((6.622020596, 9.933009978), (6.68852437, 10.353928857), (6.715549515, 10.779211228))
            ThreePointArc((6.715549515, 10.779211228), (6.35, 10.998522628), (5.977295999, 11.205442095))
        make_face()
    # profile 15 of 19: a face of its own
    with BuildSketch(Plane(origin=(11.1125, 0, 0), x_dir=(0, 0, -1), z_dir=(1, 0, 0)).offset(-BOSS_EXTRUDE1_DEPTH_BACK)):
        with BuildLine():
            ThreePointArc((9.619953385, -7.069111745), (9.145038562, -7.673598484), (8.632203428, -8.246266305))
            ThreePointArc((8.632203428, -8.246266305), (9.035179344, -8.384851534), (9.449307854, -8.485315615))
            ThreePointArc((9.449307854, -8.485315615), (9.728764428, -8.163402643), (9.997259693, -7.832292041))
            ThreePointArc((9.997259693, -7.832292041), (9.826409226, -7.441900479), (9.619953385, -7.069111745))
        make_face()
    # profile 16 of 19: a face of its own
    with BuildSketch(Plane(origin=(11.1125, 0, 0), x_dir=(0, 0, -1), z_dir=(1, 0, 0)).offset(-BOSS_EXTRUDE1_DEPTH_BACK)):
        with BuildLine():
            ThreePointArc((9.449307854, 8.485315615), (9.035179344, 8.384851534), (8.632203428, 8.246266305))
            ThreePointArc((8.632203428, 8.246266305), (9.145038562, 7.673598484), (9.619953385, 7.069111745))
            ThreePointArc((9.619953385, 7.069111745), (9.826409226, 7.441900479), (9.997259693, 7.832292041))
            ThreePointArc((9.997259693, 7.832292041), (9.728764428, 8.163402643), (9.449307854, 8.485315615))
        make_face()
    # profile 17 of 19: a face of its own
    with BuildSketch(Plane(origin=(11.1125, 0, 0), x_dir=(0, 0, -1), z_dir=(1, 0, 0)).offset(-BOSS_EXTRUDE1_DEPTH_BACK)):
        with BuildLine():
            ThreePointArc((11.457577821, -3.352574307), (11.218050507, -4.083036471), (10.932007046, -4.796568142))
            ThreePointArc((10.932007046, -4.796568142), (11.35807948, -4.788969778), (11.781593724, -4.741734842))
            ThreePointArc((11.781593724, -4.741734842), (11.934096284, -4.34365582), (12.073152809, -3.940682842))
            ThreePointArc((12.073152809, -3.940682842), (11.779084107, -3.632269073), (11.457577821, -3.352574307))
        make_face()
    # profile 18 of 19: a face of its own
    with BuildSketch(Plane(origin=(11.1125, 0, 0), x_dir=(0, 0, -1), z_dir=(1, 0, 0)).offset(-BOSS_EXTRUDE1_DEPTH_BACK)):
        with BuildLine():
            ThreePointArc((11.781593724, 4.741734842), (11.35807948, 4.788969778), (10.932007046, 4.796568142))
            ThreePointArc((10.932007046, 4.796568142), (11.218050507, 4.083036471), (11.457577821, 3.352574307))
            ThreePointArc((11.457577821, 3.352574307), (11.779084107, 3.632269073), (12.073152809, 3.940682842))
            ThreePointArc((12.073152809, 3.940682842), (11.934096284, 4.34365582), (11.781593724, 4.741734842))
        make_face()
    # profile 19 of 19: a face of its own
    with BuildSketch(Plane(origin=(11.1125, 0, 0), x_dir=(0, 0, -1), z_dir=(1, 0, 0)).offset(-BOSS_EXTRUDE1_DEPTH_BACK)):
        with BuildLine():
            ThreePointArc((11.913249275, 0.768333072), (11.938, 0), (11.913249275, -0.768333072))
            ThreePointArc((11.913249275, -0.768333072), (12.311027604, -0.61546759), (12.692845514, -0.426230867))
            ThreePointArc((12.692845514, -0.426230867), (12.7, 0), (12.692845514, 0.426230867))
            ThreePointArc((12.692845514, 0.426230867), (12.311027604, 0.61546759), (11.913249275, 0.768333072))
        make_face()
    extrude(amount=BOSS_EXTRUDE1_DEPTH + BOSS_EXTRUDE1_DEPTH_BACK)

    # Sketch2 → Boss-Extrude2 (add)
    with BuildSketch(Plane(origin=(15.1125, 0, 0), x_dir=(0, 0, -1), z_dir=(1, 0, 0))):
        Circle(SKETCH2_R)
        Circle(SKETCH2_R_2, mode=Mode.SUBTRACT)
    extrude(amount=BOSS_EXTRUDE2_DEPTH)

    # Sketch3 → Boss-Extrude3 (add)
    with BuildSketch(Plane.ZY.offset(2.0875)):
        with Locations(Location((0, 0, 0), (0, 0, 180))):
            Circle(SKETCH3_R)
        Circle(SKETCH3_R_2, mode=Mode.SUBTRACT)
    extrude(amount=-BOSS_EXTRUDE3_DEPTH)

    # Sketch5 → Boss-Extrude4 (add, two sides: drawn at the far end of the back side and taken through both)
    with BuildSketch(Plane(origin=(15.1125, 0, 0), x_dir=(0, 0, -1), z_dir=(1, 0, 0)).offset(-BOSS_EXTRUDE4_DEPTH_BACK)):
        Circle(SKETCH5_R)
    extrude(amount=BOSS_EXTRUDE4_DEPTH + BOSS_EXTRUDE4_DEPTH_BACK)

    # Sketch4 → Cut-Extrude1 (cut, through all)
    with BuildSketch(Plane(origin=(16.6125, 0, 0), x_dir=(0, 0, -1), z_dir=(1, 0, 0))):
        Polygon((3.669006525, -6.481388055), (7.44754997, -0.06324117), (3.778543445, 6.418146885), (-3.669006525, 6.481388055), (-7.44754997, 0.06324117), (-3.778543445, -6.418146885), align=None)
    extrude(amount=-CUT_EXTRUDE1_DEPTH, mode=Mode.SUBTRACT)


solid = part.part
